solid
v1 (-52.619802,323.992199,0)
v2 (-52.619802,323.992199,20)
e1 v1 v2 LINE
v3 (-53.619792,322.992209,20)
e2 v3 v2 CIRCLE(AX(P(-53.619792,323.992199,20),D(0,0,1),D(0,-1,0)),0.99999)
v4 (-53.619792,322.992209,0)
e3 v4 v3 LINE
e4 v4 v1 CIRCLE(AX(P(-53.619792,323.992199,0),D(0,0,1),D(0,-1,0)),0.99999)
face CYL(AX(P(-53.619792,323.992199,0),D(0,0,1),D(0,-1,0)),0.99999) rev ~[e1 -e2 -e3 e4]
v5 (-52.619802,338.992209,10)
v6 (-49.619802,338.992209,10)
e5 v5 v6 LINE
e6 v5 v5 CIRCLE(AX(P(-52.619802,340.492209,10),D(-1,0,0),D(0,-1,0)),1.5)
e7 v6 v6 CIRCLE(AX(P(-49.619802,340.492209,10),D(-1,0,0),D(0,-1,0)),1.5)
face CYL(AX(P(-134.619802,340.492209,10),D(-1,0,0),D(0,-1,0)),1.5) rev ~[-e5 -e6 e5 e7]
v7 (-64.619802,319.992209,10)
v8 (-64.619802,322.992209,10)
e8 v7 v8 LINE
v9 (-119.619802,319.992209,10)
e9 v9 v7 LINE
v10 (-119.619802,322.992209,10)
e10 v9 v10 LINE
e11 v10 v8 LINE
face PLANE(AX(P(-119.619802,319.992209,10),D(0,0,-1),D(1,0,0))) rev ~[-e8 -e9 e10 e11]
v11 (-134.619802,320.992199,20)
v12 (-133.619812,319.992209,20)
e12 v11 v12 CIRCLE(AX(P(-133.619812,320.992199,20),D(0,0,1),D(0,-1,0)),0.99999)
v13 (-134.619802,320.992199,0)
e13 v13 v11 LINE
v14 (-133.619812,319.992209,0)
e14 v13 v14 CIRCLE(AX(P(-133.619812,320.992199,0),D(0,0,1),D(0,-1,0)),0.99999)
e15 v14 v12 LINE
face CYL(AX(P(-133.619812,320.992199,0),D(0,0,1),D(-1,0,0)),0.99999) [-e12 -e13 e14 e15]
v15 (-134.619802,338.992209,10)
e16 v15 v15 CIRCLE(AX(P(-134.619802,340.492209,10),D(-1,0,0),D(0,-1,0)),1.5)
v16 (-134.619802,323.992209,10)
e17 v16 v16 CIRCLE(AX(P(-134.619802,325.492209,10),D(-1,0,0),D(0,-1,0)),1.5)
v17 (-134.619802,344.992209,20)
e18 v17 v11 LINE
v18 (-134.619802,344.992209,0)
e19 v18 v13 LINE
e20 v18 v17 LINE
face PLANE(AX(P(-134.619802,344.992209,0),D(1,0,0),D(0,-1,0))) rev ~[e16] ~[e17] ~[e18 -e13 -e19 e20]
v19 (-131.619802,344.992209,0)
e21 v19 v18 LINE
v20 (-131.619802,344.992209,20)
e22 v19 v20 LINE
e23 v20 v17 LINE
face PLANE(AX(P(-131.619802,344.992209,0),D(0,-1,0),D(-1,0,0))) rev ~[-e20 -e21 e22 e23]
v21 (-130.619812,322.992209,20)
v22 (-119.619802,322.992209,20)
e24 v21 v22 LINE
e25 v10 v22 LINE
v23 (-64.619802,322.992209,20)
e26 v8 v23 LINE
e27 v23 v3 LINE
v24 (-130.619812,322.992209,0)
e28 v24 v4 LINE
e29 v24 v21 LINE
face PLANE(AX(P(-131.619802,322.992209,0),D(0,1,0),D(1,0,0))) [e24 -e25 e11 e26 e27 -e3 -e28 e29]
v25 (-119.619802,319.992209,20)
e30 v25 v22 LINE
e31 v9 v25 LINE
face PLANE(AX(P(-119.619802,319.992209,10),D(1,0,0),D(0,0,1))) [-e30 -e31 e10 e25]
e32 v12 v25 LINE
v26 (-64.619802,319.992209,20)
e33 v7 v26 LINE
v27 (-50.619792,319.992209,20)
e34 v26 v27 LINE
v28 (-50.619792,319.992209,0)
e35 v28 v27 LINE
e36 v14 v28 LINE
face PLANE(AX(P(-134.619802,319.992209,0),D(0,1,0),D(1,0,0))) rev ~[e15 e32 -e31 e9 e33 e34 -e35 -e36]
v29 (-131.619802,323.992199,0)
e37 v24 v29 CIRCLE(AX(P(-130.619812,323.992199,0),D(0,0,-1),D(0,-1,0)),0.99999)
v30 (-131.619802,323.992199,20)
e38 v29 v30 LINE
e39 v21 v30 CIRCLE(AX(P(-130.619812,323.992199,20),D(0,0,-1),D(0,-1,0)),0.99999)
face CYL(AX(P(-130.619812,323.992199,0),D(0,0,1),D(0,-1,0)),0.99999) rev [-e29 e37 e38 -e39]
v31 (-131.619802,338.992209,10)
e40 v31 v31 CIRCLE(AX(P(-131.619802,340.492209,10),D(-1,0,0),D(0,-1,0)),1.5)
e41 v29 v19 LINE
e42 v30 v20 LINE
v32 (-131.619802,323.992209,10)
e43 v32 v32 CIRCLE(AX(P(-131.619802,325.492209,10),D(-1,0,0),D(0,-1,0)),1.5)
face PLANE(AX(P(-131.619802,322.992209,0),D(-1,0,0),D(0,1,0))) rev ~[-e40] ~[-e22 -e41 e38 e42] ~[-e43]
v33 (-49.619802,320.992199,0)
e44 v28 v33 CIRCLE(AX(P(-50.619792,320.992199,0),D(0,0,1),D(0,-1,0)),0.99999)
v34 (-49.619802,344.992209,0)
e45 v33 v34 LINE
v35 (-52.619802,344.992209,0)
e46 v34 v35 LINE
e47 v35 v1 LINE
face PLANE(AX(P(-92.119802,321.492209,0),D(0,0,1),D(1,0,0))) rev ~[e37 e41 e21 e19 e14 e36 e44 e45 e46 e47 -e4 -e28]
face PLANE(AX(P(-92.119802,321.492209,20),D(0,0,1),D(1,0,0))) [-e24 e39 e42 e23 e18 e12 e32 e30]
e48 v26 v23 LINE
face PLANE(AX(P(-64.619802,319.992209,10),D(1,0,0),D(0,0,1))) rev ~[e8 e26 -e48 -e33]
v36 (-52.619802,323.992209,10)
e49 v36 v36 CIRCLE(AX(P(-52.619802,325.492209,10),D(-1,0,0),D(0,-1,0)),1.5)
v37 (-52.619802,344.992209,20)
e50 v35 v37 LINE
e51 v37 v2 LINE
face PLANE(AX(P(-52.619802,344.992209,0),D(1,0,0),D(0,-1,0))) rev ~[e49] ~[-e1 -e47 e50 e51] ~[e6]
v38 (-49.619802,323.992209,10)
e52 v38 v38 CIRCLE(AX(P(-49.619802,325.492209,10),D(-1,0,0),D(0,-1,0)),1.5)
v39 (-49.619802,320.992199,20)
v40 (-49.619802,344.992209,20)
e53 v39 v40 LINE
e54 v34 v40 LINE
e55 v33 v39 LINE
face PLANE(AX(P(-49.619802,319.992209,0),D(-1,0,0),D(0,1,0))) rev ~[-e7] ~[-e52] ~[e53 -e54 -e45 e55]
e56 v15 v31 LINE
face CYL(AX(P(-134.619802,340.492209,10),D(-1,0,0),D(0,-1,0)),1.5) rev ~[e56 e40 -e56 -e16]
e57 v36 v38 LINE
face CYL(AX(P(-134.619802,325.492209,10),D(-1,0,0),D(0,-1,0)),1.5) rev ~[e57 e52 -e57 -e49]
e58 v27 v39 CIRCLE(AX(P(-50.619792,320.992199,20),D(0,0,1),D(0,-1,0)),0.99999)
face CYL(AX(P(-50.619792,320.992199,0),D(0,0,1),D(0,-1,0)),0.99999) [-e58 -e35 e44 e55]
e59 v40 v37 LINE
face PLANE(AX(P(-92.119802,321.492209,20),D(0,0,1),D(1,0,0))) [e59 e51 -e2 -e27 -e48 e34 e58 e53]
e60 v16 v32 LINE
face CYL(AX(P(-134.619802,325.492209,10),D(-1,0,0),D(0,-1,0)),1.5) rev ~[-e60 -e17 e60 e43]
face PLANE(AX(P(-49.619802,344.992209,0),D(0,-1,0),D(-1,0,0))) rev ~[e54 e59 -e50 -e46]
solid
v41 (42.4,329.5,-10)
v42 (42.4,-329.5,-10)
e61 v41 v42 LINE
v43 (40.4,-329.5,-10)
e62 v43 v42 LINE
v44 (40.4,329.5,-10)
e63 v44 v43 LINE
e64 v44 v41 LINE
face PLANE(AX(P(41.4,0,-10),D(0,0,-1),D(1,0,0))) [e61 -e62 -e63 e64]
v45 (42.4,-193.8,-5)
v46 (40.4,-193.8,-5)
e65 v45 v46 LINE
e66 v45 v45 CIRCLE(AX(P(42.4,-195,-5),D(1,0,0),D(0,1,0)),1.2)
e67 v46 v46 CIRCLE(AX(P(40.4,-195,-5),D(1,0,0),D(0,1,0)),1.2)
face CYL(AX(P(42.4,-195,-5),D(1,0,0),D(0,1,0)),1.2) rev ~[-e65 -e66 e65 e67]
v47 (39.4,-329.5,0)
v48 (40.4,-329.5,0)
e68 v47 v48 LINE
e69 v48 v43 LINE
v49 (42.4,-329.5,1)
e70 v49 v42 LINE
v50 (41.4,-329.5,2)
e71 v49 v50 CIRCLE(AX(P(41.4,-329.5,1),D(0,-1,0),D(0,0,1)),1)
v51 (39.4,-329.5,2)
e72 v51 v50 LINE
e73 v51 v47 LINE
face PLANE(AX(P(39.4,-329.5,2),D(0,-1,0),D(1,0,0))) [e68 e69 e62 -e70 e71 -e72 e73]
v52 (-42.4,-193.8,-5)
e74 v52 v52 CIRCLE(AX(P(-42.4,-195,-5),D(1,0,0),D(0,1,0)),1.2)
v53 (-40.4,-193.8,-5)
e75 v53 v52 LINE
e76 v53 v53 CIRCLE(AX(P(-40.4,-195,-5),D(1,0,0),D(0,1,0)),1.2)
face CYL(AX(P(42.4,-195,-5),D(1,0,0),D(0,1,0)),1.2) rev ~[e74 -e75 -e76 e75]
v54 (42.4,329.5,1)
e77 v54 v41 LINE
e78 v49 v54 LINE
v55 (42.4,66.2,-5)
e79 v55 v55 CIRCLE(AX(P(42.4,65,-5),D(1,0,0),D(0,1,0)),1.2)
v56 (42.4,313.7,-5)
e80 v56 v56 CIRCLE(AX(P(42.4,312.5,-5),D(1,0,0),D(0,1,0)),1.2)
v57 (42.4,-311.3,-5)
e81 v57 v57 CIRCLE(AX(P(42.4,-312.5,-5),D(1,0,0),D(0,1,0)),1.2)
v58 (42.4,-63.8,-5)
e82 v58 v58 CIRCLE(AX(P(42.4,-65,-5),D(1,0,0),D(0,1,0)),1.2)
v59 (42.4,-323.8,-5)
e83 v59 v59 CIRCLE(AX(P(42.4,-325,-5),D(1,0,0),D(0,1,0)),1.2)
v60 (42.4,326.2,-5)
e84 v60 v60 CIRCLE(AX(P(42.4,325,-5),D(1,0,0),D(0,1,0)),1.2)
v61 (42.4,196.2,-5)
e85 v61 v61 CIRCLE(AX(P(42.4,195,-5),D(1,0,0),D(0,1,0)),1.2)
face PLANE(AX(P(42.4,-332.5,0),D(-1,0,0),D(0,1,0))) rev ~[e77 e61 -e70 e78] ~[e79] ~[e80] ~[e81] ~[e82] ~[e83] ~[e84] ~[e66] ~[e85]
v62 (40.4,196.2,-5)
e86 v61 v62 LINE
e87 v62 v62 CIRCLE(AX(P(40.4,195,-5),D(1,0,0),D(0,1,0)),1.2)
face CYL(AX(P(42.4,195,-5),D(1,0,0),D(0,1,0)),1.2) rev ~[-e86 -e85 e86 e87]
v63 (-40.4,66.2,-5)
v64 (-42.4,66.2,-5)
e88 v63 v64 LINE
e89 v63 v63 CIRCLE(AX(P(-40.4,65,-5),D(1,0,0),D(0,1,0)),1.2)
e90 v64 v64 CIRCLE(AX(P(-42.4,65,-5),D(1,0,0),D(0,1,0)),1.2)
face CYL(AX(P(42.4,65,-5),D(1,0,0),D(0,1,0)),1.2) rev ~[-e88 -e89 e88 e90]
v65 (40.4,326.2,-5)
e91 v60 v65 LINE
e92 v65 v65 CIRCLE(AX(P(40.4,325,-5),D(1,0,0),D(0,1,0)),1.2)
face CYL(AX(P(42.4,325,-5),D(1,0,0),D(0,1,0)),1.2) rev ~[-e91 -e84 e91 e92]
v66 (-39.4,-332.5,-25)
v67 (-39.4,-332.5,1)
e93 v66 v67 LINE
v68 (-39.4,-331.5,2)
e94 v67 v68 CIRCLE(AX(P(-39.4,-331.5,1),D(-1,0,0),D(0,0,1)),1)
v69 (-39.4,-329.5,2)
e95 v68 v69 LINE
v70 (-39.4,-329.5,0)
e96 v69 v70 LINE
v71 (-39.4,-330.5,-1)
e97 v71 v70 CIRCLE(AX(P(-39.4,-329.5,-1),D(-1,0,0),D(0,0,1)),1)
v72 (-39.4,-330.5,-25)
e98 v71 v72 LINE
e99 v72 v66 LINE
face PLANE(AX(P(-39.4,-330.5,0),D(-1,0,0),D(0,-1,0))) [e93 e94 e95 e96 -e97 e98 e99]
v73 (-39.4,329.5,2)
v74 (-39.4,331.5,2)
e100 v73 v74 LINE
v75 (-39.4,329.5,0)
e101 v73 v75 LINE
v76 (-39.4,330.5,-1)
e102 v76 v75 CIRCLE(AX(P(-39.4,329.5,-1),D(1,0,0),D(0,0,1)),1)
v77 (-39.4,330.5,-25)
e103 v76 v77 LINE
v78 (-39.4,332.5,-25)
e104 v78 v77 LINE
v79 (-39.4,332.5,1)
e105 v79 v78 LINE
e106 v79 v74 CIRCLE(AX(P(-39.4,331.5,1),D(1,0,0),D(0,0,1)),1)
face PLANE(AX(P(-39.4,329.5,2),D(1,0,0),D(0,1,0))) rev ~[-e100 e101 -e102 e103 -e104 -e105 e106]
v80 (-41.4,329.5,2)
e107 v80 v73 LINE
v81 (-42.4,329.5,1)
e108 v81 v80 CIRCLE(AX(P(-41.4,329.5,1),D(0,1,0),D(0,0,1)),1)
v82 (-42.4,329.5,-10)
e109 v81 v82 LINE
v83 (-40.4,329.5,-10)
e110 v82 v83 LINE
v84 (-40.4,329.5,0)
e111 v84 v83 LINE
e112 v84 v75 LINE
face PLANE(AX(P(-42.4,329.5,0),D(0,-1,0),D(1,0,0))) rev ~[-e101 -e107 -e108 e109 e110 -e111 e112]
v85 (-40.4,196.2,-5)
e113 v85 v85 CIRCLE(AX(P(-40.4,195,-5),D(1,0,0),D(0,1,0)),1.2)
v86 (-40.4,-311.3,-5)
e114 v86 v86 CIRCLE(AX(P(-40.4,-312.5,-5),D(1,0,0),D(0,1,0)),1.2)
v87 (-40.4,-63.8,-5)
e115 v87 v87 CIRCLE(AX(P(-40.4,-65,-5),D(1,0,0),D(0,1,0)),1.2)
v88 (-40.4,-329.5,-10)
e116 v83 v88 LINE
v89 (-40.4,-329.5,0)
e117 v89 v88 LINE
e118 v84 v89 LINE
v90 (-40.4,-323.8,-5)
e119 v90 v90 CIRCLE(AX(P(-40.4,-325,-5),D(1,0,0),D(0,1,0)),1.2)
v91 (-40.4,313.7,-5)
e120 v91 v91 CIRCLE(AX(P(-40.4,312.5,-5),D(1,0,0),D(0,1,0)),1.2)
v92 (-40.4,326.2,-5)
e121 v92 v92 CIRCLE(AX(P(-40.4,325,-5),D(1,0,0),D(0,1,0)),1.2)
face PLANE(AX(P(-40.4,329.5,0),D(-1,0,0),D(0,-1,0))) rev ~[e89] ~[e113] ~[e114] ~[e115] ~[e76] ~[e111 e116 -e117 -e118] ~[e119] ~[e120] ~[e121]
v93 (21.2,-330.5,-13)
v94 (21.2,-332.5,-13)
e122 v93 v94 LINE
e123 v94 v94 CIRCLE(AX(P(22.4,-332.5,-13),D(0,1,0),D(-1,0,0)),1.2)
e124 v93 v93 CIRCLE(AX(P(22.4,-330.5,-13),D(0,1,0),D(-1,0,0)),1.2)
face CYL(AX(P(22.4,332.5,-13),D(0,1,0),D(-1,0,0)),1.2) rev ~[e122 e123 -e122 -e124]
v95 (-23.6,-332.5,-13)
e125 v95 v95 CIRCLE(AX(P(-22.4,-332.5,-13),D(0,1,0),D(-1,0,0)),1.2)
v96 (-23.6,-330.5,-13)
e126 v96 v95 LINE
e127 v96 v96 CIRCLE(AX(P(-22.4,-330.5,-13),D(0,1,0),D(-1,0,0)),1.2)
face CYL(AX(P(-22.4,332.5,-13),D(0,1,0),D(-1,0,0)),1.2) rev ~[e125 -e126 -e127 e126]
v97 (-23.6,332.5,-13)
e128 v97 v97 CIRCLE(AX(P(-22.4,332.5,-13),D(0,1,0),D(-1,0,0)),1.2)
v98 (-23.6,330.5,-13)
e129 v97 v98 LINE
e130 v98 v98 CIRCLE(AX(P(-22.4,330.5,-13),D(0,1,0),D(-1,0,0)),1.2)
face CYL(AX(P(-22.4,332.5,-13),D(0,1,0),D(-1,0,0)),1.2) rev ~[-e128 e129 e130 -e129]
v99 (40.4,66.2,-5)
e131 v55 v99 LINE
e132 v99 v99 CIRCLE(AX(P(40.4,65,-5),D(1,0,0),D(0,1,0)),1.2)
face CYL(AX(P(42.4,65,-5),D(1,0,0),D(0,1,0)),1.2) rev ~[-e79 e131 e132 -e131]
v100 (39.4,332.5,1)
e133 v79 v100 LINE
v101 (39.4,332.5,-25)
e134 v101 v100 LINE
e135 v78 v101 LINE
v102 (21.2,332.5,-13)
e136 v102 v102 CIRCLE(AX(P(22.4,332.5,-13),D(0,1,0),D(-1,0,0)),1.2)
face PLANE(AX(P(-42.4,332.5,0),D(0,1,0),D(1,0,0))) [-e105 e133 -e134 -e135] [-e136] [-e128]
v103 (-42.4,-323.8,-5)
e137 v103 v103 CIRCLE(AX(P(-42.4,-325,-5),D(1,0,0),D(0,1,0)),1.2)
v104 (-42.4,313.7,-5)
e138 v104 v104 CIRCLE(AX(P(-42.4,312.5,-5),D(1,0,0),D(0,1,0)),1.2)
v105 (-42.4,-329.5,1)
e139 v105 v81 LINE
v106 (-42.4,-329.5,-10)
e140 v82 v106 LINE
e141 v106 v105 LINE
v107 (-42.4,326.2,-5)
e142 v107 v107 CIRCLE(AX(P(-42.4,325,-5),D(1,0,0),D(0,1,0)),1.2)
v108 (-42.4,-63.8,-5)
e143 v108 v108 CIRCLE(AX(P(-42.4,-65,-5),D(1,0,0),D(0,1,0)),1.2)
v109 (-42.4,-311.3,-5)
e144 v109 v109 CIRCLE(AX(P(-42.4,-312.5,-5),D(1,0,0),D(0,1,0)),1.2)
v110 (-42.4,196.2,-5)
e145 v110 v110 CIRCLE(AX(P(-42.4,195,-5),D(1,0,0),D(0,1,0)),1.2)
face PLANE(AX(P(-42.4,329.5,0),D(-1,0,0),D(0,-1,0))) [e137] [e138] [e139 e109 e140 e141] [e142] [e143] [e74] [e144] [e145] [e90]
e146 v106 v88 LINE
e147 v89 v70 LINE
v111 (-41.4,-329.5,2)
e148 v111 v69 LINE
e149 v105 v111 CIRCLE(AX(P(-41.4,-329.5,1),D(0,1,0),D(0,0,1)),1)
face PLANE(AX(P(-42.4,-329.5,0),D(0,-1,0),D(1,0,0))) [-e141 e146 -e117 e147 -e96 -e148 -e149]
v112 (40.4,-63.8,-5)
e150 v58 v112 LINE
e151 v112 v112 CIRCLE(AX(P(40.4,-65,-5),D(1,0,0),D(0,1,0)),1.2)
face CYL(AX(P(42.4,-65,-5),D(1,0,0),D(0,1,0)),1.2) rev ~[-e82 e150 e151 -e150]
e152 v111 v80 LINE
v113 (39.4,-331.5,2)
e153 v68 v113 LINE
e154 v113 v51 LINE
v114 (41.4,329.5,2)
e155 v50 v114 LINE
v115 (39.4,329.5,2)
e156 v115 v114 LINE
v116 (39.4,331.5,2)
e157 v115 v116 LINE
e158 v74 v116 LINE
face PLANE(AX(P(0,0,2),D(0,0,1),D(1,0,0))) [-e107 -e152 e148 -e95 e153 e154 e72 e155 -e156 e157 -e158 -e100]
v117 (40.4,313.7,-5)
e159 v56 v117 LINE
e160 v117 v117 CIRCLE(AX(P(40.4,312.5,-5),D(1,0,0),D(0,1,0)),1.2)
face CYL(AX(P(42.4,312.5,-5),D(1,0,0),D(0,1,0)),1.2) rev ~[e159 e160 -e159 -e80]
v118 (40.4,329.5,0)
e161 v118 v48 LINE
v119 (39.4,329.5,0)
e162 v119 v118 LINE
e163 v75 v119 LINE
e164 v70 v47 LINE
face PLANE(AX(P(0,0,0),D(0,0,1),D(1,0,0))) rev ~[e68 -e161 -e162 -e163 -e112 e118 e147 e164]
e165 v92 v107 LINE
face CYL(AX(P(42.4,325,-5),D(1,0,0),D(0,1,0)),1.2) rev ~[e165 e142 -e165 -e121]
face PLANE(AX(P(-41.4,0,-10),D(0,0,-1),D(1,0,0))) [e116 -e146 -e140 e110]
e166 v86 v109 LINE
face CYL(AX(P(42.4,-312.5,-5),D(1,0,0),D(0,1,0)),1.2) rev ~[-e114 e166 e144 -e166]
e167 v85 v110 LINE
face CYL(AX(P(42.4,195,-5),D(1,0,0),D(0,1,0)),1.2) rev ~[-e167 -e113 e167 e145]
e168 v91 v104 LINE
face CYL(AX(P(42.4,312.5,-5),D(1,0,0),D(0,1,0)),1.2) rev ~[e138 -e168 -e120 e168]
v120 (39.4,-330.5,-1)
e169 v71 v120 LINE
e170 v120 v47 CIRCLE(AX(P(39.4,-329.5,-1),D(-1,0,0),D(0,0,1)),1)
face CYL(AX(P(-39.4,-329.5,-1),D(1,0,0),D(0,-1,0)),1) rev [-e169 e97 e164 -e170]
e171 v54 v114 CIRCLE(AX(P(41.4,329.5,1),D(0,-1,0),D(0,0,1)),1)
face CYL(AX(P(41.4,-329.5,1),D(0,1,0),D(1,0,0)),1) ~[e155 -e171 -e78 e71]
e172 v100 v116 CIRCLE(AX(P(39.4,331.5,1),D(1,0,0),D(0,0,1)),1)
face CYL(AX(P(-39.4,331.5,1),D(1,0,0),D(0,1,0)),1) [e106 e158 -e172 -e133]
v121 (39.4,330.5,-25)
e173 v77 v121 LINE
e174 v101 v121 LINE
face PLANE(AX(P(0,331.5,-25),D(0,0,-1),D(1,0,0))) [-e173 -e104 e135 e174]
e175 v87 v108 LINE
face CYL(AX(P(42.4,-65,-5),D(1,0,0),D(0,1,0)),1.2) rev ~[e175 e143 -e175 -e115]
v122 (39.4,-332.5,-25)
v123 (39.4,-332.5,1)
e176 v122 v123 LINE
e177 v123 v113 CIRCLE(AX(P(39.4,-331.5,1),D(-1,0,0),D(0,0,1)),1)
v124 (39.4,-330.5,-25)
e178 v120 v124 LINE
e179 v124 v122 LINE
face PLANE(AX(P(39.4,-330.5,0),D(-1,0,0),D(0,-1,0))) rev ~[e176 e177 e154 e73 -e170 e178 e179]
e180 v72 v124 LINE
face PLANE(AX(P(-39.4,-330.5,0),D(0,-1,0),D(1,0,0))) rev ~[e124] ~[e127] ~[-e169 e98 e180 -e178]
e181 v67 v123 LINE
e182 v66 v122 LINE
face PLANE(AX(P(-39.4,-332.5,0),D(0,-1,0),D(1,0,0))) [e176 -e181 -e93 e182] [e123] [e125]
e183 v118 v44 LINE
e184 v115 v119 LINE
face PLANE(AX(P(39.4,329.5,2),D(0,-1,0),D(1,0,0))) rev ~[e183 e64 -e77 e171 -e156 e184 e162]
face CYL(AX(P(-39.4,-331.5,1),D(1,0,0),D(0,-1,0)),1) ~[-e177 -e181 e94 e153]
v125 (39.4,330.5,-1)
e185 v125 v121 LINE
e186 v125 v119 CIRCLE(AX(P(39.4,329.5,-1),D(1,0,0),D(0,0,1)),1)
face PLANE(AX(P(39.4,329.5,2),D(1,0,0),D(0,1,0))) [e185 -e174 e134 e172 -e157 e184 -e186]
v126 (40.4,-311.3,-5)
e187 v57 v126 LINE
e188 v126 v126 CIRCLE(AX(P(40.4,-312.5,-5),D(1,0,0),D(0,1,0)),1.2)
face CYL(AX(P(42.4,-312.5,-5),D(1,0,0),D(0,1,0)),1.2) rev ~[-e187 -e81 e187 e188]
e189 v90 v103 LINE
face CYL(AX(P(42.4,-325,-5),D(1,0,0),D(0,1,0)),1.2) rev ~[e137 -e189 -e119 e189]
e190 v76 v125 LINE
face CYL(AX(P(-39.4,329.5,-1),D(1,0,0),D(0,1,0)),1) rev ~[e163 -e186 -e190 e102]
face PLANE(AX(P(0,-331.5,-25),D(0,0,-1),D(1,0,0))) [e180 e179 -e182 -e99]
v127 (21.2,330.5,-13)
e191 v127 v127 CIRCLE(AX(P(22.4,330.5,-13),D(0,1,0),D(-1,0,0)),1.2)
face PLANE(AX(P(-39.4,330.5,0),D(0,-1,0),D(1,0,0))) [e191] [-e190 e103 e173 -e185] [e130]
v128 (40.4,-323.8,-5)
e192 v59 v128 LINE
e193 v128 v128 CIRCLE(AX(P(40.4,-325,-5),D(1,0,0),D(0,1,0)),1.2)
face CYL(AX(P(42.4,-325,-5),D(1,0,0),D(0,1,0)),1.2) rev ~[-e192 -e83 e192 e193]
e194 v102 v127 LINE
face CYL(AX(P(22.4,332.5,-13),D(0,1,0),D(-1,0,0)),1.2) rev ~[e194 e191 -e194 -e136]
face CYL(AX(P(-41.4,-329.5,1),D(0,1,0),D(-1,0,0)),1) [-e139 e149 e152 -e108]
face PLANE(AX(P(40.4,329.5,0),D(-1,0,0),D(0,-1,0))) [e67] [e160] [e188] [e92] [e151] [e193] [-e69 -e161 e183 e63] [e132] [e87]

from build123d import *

# Parameters (mm, degrees)
F0_W      = 84.8
F0_H      = 665
F1_DEPTH  = 2
F2_W      = 3
F2_H      = 3
F3_DEPTH  = 2
F4_W      = 78.8
F4_H      = 2
F5_DEPTH  = 25
F4_W_2    = 2
F4_H_2    = 659
F6_DEPTH  = 10
F7_R      = 1
F8_R      = 1.2
F9_DEPTH  = 665.001
F10_R     = 1.2
F11_DEPTH = 84.801
F12_W     = 79
F12_H     = 3
F13_DEPTH = 20
F14_R     = 1.5
F15_DEPTH = 177.0208022366
F16_R     = 0.99999
F17_W     = 55
F17_H     = 10
F18_DEPTH = 3


# Not quite as in the source:
# - a fillet or chamfer is up to 0.001 mm smaller than in the source, because OpenCascade refuses the exact size


with BuildPart() as f1:
    # F0 (on Top) → F1 (new body)
    with BuildSketch(Plane.XY):
        Rectangle(F0_W, F0_H)
    extrude(amount=F1_DEPTH)

    # F2 (on face) → F3 (cut)
    with BuildSketch(Plane.XY.offset(2)):
        with Locations((-40.9, 331)):
            Rectangle(F2_W, F2_H)
        with Locations((40.9, 331)):
            Rectangle(F2_W, F2_H)
        with Locations((40.9, -331)):
            Rectangle(F2_W, F2_H)
        with Locations((-40.9, -331)):
            Rectangle(F2_W, F2_H)
    extrude(amount=-F3_DEPTH, mode=Mode.SUBTRACT)

    # F4 (on face) → F5 (join)
    with BuildSketch(Plane(origin=(0, 0, 0), x_dir=(1, 0, 0), z_dir=(0, 0, -1))):
        with Locations((0, 331.5)):
            Rectangle(F4_W, F4_H)
        with Locations((0, -331.5)):
            Rectangle(F4_W, F4_H)
    extrude(amount=F5_DEPTH)

    # F4 (on face) → F6 (join)
    with BuildSketch(Plane(origin=(0, 0, 0), x_dir=(1, 0, 0), z_dir=(0, 0, -1))):
        with Locations((-41.4, 0)):
            Rectangle(F4_W_2, F4_H_2)
        with Locations((41.4, 0)):
            Rectangle(F4_W_2, F4_H_2)
    extrude(amount=F6_DEPTH)

    # F7
    f7_edges = [f1.edges().sort_by_distance(p)[0] for p in [
        (0, 332.5, 2),
        (-42.4, 0, 2),
        (0, 330.5, 0),
        (42.4, 0, 2),
        (0, -332.5, 2),
        (0, -330.5, 0),
    ]]
    fillet(f7_edges, radius=F7_R)

    # F8 (on face) → F9 (cut, through all)
    with BuildSketch(Plane(origin=(0, 332.5, 0), x_dir=(-1, 0, 0), z_dir=(0, 1, 0))):
        with Locations((-22.4, -13)):
            Circle(F8_R)
        with Locations((22.4, -13)):
            Circle(F8_R)
    extrude(amount=-F9_DEPTH, mode=Mode.SUBTRACT)

    # F10 (on face) → F11 (cut, through all)
    with BuildSketch(Plane.YZ.offset(42.4)):
        with Locations((325, -5)):
            Circle(F10_R)
        with Locations((195, -5)):
            Circle(F10_R)
        with Locations((65, -5)):
            Circle(F10_R)
        with Locations((-65, -5)):
            Circle(F10_R)
        with Locations((-195, -5)):
            Circle(F10_R)
        with Locations((-325, -5)):
            Circle(F10_R)
        with Locations((312.5, -5)):
            Circle(F10_R)
        with Locations((-312.5, -5)):
            Circle(F10_R)
    extrude(amount=-F11_DEPTH, mode=Mode.SUBTRACT)


with BuildPart() as f13:
    # F12 (on Top) → F13 (new body)
    with BuildSketch(Plane.XY):
        with Locations((-92.1198022366, 321.4922089577)):
            Rectangle(F12_W, F12_H)
        Polygon((-131.6198022366, 319.9922089577), (-131.6198022366, 322.9922089577), (-131.6198022366, 344.9922089577), (-134.6198022366, 344.9922089577), (-134.6198022366, 319.9922089577), align=None)
        Polygon((-52.6198022366, 344.9922089577), (-52.6198022366, 322.9922089577), (-52.6198022366, 319.9922089577), (-49.6198022366, 319.9922089577), (-49.6198022366, 344.9922089577), align=None)
    extrude(amount=F13_DEPTH)

    # F14 (on face) → F15 (cut, through all)
    with BuildSketch(Plane(origin=(-134.6198022366, 0, 0), x_dir=(0, -1, 0), z_dir=(-1, 0, 0))):
        with Locations((-325.4922089577, 10)):
            Circle(F14_R)
        with Locations((-340.4922089577, 10)):
            Circle(F14_R)
    extrude(amount=-F15_DEPTH, mode=Mode.SUBTRACT)

    # F16 (radius 1 in the source; OpenCascade refuses exactly that, so slightly less here)
    f16_edges = [f13.edges().sort_by_distance(p)[0] for p in [
        (-49.619802, 319.992209, 10),
        (-52.619802, 322.992209, 10),
        (-134.619802, 319.992209, 10),
        (-131.619802, 322.992209, 10),
    ]]
    fillet(f16_edges, radius=F16_R)

    # F17 (on face) → F18 (cut)
    with BuildSketch(Plane.XZ.offset(-319.9922089577)):
        with Locations((-92.1198022366, 15)):
            Rectangle(F17_W, F17_H)
    extrude(amount=-F18_DEPTH, mode=Mode.SUBTRACT)


solid = Compound([f1.part, f13.part])
